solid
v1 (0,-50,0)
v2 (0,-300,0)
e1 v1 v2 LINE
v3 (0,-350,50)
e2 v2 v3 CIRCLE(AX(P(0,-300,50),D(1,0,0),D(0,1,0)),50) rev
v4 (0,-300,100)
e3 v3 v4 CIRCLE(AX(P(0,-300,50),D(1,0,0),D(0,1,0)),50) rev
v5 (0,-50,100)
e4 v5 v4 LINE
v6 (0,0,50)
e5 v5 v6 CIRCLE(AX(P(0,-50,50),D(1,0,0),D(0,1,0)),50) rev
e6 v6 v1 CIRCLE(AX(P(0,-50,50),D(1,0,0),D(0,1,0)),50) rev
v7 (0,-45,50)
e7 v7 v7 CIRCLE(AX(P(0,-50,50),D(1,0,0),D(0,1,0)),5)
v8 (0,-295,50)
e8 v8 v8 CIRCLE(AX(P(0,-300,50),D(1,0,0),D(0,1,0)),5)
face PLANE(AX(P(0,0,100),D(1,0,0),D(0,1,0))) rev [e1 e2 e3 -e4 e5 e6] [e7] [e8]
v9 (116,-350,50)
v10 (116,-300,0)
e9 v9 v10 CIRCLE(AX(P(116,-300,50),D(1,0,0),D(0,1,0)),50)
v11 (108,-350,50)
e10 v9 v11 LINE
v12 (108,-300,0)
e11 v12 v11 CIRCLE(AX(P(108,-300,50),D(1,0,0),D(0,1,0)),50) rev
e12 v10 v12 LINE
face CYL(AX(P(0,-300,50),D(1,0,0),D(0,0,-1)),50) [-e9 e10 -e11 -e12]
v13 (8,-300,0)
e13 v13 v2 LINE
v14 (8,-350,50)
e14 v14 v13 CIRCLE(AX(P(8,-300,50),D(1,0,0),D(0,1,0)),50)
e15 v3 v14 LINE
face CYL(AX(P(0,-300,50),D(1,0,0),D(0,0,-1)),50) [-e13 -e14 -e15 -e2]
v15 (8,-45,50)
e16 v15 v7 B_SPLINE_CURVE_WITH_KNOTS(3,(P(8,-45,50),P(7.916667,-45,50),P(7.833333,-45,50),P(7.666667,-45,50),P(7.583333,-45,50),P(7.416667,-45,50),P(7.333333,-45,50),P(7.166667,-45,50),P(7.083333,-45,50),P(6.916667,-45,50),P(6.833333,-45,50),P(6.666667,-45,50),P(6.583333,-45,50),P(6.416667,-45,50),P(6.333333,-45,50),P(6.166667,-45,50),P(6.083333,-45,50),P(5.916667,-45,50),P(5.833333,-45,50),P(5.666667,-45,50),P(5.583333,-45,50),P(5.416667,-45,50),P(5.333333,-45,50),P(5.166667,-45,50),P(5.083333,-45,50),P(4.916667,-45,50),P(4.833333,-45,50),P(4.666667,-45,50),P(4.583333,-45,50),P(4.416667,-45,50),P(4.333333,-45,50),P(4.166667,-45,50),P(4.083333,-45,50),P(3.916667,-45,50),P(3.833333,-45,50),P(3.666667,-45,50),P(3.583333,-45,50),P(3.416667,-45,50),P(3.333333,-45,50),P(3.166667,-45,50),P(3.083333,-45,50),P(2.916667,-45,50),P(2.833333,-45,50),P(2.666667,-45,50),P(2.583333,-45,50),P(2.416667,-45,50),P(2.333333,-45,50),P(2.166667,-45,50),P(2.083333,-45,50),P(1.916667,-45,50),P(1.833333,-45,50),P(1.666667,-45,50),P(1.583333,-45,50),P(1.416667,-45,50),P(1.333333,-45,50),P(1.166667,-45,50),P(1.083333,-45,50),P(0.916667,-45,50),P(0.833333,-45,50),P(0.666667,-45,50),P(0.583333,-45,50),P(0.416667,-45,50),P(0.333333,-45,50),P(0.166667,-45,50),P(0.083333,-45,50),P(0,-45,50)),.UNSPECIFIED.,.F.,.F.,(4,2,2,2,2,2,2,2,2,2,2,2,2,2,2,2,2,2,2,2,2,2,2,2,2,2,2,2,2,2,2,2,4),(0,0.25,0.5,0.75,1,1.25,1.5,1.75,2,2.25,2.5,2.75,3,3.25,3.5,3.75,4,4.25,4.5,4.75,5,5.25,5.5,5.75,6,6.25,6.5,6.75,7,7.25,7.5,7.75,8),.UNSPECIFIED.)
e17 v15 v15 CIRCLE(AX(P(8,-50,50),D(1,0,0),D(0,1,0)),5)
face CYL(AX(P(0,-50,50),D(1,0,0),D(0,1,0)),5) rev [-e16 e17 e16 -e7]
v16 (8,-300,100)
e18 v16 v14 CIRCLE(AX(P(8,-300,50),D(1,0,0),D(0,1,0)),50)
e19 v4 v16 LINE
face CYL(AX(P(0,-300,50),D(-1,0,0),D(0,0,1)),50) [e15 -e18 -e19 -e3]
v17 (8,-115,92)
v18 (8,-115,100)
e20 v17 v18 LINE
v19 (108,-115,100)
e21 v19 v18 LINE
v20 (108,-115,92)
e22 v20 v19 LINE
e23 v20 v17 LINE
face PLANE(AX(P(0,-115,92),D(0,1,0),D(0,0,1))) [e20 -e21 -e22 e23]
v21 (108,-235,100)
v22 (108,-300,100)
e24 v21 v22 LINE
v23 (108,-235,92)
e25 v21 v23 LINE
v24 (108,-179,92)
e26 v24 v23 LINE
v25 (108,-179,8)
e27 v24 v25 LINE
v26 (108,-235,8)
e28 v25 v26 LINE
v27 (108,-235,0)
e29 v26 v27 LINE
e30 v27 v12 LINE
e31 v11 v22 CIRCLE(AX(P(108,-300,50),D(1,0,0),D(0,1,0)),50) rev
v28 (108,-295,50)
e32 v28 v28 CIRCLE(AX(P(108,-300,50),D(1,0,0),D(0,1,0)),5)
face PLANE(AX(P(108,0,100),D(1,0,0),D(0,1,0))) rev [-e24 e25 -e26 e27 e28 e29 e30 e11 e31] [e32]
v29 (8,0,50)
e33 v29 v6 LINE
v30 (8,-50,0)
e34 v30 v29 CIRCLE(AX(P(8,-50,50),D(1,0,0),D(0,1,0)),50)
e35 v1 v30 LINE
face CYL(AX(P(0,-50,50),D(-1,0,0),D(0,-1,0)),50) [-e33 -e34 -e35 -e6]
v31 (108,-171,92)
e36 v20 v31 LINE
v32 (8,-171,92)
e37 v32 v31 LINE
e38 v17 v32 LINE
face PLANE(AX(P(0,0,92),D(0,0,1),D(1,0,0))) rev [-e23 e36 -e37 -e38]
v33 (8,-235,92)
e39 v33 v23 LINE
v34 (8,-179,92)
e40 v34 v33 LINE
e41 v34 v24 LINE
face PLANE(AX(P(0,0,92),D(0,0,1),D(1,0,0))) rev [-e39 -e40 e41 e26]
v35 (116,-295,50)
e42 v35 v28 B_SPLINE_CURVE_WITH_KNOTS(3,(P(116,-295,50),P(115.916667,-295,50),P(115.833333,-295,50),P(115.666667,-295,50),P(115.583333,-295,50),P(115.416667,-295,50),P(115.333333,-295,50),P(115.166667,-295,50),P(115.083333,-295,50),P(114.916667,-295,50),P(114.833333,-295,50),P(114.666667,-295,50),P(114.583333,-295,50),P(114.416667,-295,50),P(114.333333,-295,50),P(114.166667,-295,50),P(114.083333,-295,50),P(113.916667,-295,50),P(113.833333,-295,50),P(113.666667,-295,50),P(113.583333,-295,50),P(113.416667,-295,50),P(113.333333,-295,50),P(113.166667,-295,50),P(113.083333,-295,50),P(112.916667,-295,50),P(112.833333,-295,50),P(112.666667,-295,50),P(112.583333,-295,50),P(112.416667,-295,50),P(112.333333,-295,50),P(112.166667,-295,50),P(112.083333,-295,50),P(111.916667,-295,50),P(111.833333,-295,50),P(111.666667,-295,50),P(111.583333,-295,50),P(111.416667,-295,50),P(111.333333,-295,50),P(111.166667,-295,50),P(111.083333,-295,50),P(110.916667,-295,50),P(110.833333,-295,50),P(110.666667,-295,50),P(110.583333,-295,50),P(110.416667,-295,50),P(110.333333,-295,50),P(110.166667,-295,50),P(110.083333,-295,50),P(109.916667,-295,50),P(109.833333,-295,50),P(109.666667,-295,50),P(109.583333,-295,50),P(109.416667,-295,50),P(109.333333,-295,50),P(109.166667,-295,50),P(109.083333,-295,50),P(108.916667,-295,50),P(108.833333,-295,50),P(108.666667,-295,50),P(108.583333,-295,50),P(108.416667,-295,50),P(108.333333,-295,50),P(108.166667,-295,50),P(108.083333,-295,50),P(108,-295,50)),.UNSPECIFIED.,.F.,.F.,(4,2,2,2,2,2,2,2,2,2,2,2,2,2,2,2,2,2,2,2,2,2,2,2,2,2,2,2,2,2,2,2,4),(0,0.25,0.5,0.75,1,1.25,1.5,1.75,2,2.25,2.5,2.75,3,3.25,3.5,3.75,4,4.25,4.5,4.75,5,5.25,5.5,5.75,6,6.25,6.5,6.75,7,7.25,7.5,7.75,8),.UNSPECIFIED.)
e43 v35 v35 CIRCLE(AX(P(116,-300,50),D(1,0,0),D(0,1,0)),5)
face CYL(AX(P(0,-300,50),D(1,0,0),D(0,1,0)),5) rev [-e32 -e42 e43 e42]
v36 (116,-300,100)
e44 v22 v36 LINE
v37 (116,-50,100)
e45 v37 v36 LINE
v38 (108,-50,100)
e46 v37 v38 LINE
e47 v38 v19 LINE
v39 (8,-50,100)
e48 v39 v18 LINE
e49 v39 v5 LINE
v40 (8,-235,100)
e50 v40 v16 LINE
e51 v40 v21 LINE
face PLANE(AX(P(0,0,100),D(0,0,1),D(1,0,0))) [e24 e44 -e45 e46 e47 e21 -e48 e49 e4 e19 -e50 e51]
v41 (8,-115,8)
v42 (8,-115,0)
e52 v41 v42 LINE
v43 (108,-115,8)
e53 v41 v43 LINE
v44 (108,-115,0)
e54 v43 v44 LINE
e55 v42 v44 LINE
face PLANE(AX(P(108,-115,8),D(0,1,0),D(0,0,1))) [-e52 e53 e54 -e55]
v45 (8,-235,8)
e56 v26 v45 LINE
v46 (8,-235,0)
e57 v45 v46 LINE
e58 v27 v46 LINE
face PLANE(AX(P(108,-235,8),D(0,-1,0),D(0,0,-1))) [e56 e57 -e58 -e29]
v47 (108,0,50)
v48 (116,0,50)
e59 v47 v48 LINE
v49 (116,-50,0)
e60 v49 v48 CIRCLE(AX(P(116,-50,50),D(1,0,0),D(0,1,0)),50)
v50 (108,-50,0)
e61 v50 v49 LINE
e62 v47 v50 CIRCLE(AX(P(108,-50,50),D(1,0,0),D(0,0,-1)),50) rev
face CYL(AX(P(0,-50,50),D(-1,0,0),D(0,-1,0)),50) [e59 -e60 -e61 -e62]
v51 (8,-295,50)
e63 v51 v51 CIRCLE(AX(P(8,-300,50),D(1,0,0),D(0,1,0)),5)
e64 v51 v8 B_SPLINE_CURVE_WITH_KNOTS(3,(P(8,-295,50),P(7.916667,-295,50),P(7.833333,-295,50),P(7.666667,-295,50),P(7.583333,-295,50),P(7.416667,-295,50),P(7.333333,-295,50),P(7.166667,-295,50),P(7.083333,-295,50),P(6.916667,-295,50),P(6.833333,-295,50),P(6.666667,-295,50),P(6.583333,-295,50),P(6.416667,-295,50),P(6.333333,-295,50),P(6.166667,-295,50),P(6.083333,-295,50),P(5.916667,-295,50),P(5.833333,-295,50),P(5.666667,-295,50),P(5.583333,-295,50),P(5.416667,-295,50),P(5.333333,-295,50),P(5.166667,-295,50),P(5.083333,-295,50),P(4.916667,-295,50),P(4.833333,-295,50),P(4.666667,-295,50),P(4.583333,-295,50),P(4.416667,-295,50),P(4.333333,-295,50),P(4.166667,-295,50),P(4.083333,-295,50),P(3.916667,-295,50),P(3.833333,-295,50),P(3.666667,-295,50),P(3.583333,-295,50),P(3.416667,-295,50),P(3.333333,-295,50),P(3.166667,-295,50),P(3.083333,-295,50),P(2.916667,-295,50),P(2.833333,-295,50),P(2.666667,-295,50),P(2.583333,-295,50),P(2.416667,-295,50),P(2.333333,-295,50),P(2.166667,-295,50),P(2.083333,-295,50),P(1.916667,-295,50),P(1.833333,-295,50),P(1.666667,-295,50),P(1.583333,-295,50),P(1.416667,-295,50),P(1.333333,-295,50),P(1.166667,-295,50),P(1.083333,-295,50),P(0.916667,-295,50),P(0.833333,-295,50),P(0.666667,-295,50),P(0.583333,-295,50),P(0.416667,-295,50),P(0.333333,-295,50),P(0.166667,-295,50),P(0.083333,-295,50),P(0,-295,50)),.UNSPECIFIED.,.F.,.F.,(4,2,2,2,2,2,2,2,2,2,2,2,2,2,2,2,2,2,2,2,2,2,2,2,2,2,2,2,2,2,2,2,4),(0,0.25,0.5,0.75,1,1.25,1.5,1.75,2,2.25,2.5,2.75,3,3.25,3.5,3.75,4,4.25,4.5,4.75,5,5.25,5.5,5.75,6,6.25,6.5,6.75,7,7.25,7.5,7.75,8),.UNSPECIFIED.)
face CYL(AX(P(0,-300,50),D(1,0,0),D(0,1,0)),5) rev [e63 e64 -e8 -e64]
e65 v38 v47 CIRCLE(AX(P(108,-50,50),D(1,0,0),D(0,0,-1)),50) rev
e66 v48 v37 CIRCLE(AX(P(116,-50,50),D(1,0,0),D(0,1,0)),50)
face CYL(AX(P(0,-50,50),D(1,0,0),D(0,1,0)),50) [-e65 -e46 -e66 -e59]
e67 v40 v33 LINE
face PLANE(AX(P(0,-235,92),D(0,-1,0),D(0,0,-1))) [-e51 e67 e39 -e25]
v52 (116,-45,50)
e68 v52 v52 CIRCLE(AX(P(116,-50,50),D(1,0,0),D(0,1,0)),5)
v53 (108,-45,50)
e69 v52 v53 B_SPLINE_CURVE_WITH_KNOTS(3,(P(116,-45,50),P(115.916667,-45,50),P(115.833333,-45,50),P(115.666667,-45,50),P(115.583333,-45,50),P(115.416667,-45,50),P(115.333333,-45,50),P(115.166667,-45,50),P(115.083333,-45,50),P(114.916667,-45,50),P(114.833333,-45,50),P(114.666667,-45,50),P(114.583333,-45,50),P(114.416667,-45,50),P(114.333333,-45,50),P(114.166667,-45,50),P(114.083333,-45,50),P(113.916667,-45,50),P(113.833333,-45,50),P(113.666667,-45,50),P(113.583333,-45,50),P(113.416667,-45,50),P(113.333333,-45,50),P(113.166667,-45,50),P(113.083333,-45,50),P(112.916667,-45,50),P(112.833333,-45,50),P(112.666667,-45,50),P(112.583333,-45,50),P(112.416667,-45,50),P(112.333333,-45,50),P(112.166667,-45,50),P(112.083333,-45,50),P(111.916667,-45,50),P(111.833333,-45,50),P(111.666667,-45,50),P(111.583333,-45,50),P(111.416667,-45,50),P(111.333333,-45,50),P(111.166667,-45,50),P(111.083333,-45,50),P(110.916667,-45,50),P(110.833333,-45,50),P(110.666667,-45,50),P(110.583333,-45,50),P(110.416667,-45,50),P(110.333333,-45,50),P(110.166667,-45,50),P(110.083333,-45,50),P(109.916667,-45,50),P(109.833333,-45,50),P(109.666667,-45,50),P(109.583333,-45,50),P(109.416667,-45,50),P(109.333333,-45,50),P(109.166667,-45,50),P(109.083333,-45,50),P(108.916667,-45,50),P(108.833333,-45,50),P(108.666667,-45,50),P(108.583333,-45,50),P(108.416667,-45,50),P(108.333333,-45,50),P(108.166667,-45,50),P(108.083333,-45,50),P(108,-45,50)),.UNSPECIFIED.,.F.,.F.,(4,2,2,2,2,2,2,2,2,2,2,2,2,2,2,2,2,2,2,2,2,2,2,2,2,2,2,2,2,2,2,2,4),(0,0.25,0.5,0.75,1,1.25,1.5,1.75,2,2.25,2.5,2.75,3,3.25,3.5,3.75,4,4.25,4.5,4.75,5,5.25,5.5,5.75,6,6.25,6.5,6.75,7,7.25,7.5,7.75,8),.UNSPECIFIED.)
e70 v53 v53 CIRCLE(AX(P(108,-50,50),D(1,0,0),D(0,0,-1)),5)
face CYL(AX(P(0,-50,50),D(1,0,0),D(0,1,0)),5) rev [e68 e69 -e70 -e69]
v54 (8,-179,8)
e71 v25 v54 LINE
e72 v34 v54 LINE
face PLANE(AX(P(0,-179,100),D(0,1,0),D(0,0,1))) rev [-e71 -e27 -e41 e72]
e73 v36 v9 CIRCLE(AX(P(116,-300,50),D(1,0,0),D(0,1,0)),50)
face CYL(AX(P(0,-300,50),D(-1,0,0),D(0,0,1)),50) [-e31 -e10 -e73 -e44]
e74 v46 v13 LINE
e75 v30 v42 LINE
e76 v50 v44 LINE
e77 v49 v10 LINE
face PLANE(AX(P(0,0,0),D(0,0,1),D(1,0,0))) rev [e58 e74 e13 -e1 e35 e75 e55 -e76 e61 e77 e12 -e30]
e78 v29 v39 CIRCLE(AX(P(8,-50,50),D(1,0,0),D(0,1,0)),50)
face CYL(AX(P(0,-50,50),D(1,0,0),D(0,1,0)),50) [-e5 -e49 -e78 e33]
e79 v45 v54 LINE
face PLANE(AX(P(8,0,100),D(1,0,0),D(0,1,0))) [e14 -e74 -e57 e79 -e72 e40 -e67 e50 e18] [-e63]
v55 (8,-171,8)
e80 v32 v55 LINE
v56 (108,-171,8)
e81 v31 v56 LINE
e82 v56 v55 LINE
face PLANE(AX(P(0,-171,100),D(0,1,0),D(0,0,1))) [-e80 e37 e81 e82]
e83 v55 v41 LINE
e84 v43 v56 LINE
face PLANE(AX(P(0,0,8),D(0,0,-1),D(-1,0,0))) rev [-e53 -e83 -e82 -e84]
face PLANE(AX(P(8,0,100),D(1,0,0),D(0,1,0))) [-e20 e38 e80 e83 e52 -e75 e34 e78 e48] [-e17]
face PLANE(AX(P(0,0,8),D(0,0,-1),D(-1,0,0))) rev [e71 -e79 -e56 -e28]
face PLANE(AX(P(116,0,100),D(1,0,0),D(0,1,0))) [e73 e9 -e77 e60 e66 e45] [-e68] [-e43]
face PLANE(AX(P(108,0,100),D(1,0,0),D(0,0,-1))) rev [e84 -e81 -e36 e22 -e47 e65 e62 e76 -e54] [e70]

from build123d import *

# Parameters (mm, degrees)
BOSS_EXTRUDE1_DEPTH = 100
FILLET1_R           = 50
SKETCH2_R           = 5
CUT_EXTRUDE1_DEPTH  = 116
SKETCH5_W           = 116
SKETCH5_H           = 120
BOSS_EXTRUDE4_DEPTH = 8
SKETCH6_W           = 100
SKETCH6_H           = 120
BOSS_EXTRUDE6_DEPTH = 8


with BuildPart() as part:
    # Sketch1 → Boss-Extrude1 (new body)
    with BuildSketch(Plane.XY):
        Polygon((8, -171), (8, -8), (8, 0), (0, 0), (0, -8), (0, -146), (0, -154), (0, -292), (0, -350), (8, -350), (8, -292), (8, -179), (108, -179), (108, -292), (108, -350), (116, -350), (116, -292), (116, -154), (116, -146), (116, -8), (116, 0), (108, 0), (108, -8), (108, -171), align=None)
    extrude(amount=BOSS_EXTRUDE1_DEPTH)

    # Fillet1
    fillet1_edges = [part.edges().sort_by_distance(p)[0] for p in [
        (4, 0, 100),
        (4, 0, 0),
        (112, -350, 0),
        (112, -350, 100),
        (4, -350, 100),
        (4, -350, 0),
        (112, 0, 100),
        (112, 0, 0),
    ]]
    fillet(fillet1_edges, radius=FILLET1_R - 0.0001)  # a hair under: the kernel refuses the full size

    # Sketch2 → Cut-Extrude1 (cut)
    with BuildSketch(Plane(origin=(116, 0, 0), x_dir=(0, 0, -1), z_dir=(1, 0, 0))):
        with Locations(Location((-50, -300, 0), (0, 0, 90))):
            Circle(SKETCH2_R)
        with Locations(Location((-50, -50, 0), (0, 0, 90))):
            Circle(SKETCH2_R)
    extrude(amount=-CUT_EXTRUDE1_DEPTH, mode=Mode.SUBTRACT)

    # Sketch5 → Boss-Extrude4 (add)
    with BuildSketch(Plane.XY.offset(100)):
        with Locations((58, -175)):
            Rectangle(SKETCH5_W, SKETCH5_H)
    extrude(amount=-BOSS_EXTRUDE4_DEPTH)

    # Sketch6 → Boss-Extrude6 (add)
    with BuildSketch(Plane(origin=(0, 0, 0), x_dir=(-1, 0, 0), z_dir=(0, 0, -1))):
        with Locations((-58, -175)):
            Rectangle(SKETCH6_W, SKETCH6_H)
    extrude(amount=-BOSS_EXTRUDE6_DEPTH)


solid = part.part
